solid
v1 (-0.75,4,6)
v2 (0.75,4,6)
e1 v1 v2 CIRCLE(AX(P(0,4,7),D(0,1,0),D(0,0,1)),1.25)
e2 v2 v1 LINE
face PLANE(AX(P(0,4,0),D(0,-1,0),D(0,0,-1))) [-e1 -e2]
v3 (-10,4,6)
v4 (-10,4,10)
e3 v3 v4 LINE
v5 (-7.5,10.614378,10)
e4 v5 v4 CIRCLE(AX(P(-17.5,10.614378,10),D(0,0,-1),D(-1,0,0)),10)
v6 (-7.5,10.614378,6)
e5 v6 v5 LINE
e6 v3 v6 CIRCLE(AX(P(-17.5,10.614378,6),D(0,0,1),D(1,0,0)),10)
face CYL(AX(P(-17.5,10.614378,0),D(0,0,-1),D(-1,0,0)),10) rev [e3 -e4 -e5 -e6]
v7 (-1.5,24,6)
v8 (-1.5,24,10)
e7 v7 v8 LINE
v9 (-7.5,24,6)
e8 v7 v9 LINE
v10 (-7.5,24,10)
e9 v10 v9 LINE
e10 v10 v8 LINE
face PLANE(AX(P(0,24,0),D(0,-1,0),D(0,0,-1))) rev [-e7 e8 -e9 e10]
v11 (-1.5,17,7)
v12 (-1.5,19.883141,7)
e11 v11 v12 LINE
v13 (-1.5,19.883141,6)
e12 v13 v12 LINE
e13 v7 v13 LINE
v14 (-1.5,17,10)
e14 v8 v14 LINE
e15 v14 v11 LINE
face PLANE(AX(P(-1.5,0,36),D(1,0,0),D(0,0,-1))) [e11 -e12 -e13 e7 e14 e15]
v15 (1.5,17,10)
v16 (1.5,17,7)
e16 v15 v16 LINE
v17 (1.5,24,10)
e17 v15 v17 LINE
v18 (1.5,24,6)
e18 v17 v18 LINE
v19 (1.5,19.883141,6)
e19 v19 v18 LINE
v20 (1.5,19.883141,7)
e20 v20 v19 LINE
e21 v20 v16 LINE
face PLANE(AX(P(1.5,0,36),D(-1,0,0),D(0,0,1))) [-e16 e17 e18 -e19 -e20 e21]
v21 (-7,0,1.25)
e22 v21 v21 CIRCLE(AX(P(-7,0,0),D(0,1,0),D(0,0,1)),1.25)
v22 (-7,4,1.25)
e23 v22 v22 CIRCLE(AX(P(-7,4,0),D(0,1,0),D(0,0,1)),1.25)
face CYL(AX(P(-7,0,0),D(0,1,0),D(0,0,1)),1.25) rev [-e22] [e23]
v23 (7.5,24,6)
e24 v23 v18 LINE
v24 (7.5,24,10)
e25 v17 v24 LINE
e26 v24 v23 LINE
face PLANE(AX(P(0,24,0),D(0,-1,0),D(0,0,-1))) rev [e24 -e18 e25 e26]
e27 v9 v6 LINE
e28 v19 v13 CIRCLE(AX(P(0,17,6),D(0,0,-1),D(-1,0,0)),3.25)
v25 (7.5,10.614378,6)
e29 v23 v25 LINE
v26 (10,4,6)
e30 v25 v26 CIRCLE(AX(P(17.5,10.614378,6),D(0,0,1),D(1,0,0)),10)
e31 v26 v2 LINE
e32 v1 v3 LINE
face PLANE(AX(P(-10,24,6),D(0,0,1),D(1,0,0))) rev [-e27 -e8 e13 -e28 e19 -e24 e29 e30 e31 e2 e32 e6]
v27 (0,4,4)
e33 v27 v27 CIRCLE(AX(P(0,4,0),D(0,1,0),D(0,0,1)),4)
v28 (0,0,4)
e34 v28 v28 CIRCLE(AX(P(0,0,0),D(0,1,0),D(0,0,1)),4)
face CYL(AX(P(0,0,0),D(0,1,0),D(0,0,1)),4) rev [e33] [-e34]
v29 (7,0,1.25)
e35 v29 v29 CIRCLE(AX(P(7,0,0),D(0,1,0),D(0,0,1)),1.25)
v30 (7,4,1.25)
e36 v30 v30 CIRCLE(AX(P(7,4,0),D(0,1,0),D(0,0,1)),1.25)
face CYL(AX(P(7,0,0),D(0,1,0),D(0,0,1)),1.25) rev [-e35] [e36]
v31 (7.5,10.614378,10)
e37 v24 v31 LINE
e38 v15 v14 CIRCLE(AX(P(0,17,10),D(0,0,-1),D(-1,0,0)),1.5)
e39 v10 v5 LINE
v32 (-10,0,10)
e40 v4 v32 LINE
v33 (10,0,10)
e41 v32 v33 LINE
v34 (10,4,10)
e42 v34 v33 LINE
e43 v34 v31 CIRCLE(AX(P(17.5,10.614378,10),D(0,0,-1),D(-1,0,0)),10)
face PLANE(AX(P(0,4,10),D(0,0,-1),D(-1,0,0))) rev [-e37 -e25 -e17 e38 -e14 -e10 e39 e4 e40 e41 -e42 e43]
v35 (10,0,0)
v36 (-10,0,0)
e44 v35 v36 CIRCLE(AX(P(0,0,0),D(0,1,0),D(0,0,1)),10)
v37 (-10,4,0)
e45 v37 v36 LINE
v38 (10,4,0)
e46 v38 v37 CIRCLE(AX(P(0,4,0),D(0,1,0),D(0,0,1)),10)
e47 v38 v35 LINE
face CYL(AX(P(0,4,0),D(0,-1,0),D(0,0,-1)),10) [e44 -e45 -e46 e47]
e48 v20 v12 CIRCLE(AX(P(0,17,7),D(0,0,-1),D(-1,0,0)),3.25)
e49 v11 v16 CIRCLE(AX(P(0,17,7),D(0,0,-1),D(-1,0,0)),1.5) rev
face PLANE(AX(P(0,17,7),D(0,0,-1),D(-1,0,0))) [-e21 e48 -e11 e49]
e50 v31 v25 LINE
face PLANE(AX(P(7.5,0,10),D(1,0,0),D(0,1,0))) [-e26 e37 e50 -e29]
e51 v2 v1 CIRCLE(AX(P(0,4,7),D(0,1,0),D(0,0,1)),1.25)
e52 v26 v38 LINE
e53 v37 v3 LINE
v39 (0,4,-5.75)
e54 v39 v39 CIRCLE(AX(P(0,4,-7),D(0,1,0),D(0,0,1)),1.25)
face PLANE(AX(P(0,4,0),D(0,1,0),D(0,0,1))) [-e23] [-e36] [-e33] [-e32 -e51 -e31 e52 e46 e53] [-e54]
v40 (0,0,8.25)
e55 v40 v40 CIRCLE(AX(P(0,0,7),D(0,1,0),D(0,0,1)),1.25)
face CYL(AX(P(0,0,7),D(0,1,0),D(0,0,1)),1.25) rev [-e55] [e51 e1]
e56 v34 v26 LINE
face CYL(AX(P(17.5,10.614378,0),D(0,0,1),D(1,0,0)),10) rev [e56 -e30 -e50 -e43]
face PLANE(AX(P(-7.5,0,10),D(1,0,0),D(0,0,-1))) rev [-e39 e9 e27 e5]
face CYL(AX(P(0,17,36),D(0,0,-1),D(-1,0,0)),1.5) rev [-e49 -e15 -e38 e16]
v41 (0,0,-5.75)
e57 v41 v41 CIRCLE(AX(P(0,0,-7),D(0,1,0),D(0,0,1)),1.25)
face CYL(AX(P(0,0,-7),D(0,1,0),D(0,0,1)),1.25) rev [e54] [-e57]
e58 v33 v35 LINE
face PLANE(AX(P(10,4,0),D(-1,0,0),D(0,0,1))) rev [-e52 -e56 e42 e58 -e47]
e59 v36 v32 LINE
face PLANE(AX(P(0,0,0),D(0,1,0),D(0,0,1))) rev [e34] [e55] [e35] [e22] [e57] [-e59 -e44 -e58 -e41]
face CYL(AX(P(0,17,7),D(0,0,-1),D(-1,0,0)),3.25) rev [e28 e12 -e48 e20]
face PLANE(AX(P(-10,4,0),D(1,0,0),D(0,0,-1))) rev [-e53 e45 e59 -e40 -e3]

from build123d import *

# Parameters (mm, degrees)
BOSS_EXTRUDE1_DEPTH = 4
SKETCH3_R           = 4
SKETCH3_R_2         = 1.25
CUT_EXTRUDE1_DEPTH  = 4
SKETCH4_W           = 20
SKETCH4_H           = 4
BOSS_EXTRUDE2_DEPTH = 20
SKETCH5_R           = 1.5
CUT_EXTRUDE2_DEPTH  = 30
SKETCH6_R           = 3.25
CUT_EXTRUDE3_DEPTH  = 1
SKETCH7_W           = 2.5
SKETCH7_H           = 20
CUT_EXTRUDE4_DEPTH  = 4
FILLET1_R           = 10


with BuildPart() as part:
    # Sketch1 → Boss-Extrude1 (new body)
    with BuildSketch(Plane(origin=(0, 0, 0), x_dir=(1, 0, 0), z_dir=(0, 1, 0))):
        with BuildLine():
            Line((-10, -10), (10, -10))
            Line((10, -10), (10, 0))
            ThreePointArc((10, 0), (0, 10), (-10, 0))
            Line((-10, 0), (-10, -10))
        make_face()
    extrude(amount=BOSS_EXTRUDE1_DEPTH)

    # Sketch3 → Cut-Extrude1 (cut)
    with BuildSketch(Plane(origin=(0, 4, 0), x_dir=(1, 0, 0), z_dir=(0, 1, 0))):
        with Locations(Location((0, 0, 0), (0, 0, 270))):
            Circle(SKETCH3_R)
        with Locations(Location((0, 7, 0), (0, 0, 270))):
            Circle(SKETCH3_R_2)
        with Locations(Location((7, 0, 0), (0, 0, 270))):
            Circle(SKETCH3_R_2)
        with Locations(Location((0, -7, 0), (0, 0, 270))):
            Circle(SKETCH3_R_2)
        with Locations(Location((-7, 0, 0), (0, 0, 270))):
            Circle(SKETCH3_R_2)
    extrude(amount=-CUT_EXTRUDE1_DEPTH, mode=Mode.SUBTRACT)

    # Sketch4 → Boss-Extrude2 (add)
    with BuildSketch(Plane(origin=(0, 4, 0), x_dir=(1, 0, 0), z_dir=(0, 1, 0))):
        with Locations((0, -8)):
            Rectangle(SKETCH4_W, SKETCH4_H)
    extrude(amount=BOSS_EXTRUDE2_DEPTH)

    # Sketch5 → Cut-Extrude2 (cut)
    with BuildSketch(Plane(origin=(0, 0, 6), x_dir=(-1, 0, 0), z_dir=(0, 0, -1))):
        with BuildLine():
            Line((-1.5, 24), (-1.5, 17))
            ThreePointArc((-1.5, 17), (0, 18.5), (1.5, 17))
            Line((1.5, 17), (1.5, 24))
            Line((1.5, 24), (-1.5, 24))
        make_face()
        with Locations((0, 17)):
            Circle(SKETCH5_R)
    extrude(amount=-CUT_EXTRUDE2_DEPTH, mode=Mode.SUBTRACT)

    # Sketch6 → Cut-Extrude3 (cut)
    with BuildSketch(Plane(origin=(0, 0, 6), x_dir=(-1, 0, 0), z_dir=(0, 0, -1))):
        with Locations((0, 17)):
            Circle(SKETCH6_R)
    extrude(amount=-CUT_EXTRUDE3_DEPTH, mode=Mode.SUBTRACT)

    # Sketch7 → Cut-Extrude4 (cut)
    with BuildSketch(Plane(origin=(0, 0, 6), x_dir=(-1, 0, 0), z_dir=(0, 0, -1))):
        with Locations((8.75, 14)):
            Rectangle(SKETCH7_W, SKETCH7_H)
        with Locations((-8.75, 14)):
            Rectangle(SKETCH7_W, SKETCH7_H)
    extrude(amount=-CUT_EXTRUDE4_DEPTH, mode=Mode.SUBTRACT)

    # Fillet1
    # the kernel refuses this fillet: 10 mm, written as the material it adds along each edge
    with BuildSketch(Plane(origin=(7.5, 4, 6), x_dir=(0, 1, 0), z_dir=(0, 0, 1))) as fillet1_piece_1:
        with BuildLine():
            CenterArc((6.614378278, -10), FILLET1_R, 90, 41.409622109)
            Line((0, -2.5), (0, 0))
            Line((0, 0), (6.614378278, 0))
        make_face()
    extrude(amount=4)
    with BuildSketch(Plane(origin=(-7.5, 4, 6), x_dir=(0, 1, 0), z_dir=(0, 0, 1))) as fillet1_piece_2:
        with BuildLine():
            CenterArc((6.614378278, 10), FILLET1_R, 228.590377891, 41.409622109)
            Line((0, 2.5), (0, 0))
            Line((0, 0), (6.614378278, 0))
        make_face()
    extrude(amount=4)


solid = part.part
